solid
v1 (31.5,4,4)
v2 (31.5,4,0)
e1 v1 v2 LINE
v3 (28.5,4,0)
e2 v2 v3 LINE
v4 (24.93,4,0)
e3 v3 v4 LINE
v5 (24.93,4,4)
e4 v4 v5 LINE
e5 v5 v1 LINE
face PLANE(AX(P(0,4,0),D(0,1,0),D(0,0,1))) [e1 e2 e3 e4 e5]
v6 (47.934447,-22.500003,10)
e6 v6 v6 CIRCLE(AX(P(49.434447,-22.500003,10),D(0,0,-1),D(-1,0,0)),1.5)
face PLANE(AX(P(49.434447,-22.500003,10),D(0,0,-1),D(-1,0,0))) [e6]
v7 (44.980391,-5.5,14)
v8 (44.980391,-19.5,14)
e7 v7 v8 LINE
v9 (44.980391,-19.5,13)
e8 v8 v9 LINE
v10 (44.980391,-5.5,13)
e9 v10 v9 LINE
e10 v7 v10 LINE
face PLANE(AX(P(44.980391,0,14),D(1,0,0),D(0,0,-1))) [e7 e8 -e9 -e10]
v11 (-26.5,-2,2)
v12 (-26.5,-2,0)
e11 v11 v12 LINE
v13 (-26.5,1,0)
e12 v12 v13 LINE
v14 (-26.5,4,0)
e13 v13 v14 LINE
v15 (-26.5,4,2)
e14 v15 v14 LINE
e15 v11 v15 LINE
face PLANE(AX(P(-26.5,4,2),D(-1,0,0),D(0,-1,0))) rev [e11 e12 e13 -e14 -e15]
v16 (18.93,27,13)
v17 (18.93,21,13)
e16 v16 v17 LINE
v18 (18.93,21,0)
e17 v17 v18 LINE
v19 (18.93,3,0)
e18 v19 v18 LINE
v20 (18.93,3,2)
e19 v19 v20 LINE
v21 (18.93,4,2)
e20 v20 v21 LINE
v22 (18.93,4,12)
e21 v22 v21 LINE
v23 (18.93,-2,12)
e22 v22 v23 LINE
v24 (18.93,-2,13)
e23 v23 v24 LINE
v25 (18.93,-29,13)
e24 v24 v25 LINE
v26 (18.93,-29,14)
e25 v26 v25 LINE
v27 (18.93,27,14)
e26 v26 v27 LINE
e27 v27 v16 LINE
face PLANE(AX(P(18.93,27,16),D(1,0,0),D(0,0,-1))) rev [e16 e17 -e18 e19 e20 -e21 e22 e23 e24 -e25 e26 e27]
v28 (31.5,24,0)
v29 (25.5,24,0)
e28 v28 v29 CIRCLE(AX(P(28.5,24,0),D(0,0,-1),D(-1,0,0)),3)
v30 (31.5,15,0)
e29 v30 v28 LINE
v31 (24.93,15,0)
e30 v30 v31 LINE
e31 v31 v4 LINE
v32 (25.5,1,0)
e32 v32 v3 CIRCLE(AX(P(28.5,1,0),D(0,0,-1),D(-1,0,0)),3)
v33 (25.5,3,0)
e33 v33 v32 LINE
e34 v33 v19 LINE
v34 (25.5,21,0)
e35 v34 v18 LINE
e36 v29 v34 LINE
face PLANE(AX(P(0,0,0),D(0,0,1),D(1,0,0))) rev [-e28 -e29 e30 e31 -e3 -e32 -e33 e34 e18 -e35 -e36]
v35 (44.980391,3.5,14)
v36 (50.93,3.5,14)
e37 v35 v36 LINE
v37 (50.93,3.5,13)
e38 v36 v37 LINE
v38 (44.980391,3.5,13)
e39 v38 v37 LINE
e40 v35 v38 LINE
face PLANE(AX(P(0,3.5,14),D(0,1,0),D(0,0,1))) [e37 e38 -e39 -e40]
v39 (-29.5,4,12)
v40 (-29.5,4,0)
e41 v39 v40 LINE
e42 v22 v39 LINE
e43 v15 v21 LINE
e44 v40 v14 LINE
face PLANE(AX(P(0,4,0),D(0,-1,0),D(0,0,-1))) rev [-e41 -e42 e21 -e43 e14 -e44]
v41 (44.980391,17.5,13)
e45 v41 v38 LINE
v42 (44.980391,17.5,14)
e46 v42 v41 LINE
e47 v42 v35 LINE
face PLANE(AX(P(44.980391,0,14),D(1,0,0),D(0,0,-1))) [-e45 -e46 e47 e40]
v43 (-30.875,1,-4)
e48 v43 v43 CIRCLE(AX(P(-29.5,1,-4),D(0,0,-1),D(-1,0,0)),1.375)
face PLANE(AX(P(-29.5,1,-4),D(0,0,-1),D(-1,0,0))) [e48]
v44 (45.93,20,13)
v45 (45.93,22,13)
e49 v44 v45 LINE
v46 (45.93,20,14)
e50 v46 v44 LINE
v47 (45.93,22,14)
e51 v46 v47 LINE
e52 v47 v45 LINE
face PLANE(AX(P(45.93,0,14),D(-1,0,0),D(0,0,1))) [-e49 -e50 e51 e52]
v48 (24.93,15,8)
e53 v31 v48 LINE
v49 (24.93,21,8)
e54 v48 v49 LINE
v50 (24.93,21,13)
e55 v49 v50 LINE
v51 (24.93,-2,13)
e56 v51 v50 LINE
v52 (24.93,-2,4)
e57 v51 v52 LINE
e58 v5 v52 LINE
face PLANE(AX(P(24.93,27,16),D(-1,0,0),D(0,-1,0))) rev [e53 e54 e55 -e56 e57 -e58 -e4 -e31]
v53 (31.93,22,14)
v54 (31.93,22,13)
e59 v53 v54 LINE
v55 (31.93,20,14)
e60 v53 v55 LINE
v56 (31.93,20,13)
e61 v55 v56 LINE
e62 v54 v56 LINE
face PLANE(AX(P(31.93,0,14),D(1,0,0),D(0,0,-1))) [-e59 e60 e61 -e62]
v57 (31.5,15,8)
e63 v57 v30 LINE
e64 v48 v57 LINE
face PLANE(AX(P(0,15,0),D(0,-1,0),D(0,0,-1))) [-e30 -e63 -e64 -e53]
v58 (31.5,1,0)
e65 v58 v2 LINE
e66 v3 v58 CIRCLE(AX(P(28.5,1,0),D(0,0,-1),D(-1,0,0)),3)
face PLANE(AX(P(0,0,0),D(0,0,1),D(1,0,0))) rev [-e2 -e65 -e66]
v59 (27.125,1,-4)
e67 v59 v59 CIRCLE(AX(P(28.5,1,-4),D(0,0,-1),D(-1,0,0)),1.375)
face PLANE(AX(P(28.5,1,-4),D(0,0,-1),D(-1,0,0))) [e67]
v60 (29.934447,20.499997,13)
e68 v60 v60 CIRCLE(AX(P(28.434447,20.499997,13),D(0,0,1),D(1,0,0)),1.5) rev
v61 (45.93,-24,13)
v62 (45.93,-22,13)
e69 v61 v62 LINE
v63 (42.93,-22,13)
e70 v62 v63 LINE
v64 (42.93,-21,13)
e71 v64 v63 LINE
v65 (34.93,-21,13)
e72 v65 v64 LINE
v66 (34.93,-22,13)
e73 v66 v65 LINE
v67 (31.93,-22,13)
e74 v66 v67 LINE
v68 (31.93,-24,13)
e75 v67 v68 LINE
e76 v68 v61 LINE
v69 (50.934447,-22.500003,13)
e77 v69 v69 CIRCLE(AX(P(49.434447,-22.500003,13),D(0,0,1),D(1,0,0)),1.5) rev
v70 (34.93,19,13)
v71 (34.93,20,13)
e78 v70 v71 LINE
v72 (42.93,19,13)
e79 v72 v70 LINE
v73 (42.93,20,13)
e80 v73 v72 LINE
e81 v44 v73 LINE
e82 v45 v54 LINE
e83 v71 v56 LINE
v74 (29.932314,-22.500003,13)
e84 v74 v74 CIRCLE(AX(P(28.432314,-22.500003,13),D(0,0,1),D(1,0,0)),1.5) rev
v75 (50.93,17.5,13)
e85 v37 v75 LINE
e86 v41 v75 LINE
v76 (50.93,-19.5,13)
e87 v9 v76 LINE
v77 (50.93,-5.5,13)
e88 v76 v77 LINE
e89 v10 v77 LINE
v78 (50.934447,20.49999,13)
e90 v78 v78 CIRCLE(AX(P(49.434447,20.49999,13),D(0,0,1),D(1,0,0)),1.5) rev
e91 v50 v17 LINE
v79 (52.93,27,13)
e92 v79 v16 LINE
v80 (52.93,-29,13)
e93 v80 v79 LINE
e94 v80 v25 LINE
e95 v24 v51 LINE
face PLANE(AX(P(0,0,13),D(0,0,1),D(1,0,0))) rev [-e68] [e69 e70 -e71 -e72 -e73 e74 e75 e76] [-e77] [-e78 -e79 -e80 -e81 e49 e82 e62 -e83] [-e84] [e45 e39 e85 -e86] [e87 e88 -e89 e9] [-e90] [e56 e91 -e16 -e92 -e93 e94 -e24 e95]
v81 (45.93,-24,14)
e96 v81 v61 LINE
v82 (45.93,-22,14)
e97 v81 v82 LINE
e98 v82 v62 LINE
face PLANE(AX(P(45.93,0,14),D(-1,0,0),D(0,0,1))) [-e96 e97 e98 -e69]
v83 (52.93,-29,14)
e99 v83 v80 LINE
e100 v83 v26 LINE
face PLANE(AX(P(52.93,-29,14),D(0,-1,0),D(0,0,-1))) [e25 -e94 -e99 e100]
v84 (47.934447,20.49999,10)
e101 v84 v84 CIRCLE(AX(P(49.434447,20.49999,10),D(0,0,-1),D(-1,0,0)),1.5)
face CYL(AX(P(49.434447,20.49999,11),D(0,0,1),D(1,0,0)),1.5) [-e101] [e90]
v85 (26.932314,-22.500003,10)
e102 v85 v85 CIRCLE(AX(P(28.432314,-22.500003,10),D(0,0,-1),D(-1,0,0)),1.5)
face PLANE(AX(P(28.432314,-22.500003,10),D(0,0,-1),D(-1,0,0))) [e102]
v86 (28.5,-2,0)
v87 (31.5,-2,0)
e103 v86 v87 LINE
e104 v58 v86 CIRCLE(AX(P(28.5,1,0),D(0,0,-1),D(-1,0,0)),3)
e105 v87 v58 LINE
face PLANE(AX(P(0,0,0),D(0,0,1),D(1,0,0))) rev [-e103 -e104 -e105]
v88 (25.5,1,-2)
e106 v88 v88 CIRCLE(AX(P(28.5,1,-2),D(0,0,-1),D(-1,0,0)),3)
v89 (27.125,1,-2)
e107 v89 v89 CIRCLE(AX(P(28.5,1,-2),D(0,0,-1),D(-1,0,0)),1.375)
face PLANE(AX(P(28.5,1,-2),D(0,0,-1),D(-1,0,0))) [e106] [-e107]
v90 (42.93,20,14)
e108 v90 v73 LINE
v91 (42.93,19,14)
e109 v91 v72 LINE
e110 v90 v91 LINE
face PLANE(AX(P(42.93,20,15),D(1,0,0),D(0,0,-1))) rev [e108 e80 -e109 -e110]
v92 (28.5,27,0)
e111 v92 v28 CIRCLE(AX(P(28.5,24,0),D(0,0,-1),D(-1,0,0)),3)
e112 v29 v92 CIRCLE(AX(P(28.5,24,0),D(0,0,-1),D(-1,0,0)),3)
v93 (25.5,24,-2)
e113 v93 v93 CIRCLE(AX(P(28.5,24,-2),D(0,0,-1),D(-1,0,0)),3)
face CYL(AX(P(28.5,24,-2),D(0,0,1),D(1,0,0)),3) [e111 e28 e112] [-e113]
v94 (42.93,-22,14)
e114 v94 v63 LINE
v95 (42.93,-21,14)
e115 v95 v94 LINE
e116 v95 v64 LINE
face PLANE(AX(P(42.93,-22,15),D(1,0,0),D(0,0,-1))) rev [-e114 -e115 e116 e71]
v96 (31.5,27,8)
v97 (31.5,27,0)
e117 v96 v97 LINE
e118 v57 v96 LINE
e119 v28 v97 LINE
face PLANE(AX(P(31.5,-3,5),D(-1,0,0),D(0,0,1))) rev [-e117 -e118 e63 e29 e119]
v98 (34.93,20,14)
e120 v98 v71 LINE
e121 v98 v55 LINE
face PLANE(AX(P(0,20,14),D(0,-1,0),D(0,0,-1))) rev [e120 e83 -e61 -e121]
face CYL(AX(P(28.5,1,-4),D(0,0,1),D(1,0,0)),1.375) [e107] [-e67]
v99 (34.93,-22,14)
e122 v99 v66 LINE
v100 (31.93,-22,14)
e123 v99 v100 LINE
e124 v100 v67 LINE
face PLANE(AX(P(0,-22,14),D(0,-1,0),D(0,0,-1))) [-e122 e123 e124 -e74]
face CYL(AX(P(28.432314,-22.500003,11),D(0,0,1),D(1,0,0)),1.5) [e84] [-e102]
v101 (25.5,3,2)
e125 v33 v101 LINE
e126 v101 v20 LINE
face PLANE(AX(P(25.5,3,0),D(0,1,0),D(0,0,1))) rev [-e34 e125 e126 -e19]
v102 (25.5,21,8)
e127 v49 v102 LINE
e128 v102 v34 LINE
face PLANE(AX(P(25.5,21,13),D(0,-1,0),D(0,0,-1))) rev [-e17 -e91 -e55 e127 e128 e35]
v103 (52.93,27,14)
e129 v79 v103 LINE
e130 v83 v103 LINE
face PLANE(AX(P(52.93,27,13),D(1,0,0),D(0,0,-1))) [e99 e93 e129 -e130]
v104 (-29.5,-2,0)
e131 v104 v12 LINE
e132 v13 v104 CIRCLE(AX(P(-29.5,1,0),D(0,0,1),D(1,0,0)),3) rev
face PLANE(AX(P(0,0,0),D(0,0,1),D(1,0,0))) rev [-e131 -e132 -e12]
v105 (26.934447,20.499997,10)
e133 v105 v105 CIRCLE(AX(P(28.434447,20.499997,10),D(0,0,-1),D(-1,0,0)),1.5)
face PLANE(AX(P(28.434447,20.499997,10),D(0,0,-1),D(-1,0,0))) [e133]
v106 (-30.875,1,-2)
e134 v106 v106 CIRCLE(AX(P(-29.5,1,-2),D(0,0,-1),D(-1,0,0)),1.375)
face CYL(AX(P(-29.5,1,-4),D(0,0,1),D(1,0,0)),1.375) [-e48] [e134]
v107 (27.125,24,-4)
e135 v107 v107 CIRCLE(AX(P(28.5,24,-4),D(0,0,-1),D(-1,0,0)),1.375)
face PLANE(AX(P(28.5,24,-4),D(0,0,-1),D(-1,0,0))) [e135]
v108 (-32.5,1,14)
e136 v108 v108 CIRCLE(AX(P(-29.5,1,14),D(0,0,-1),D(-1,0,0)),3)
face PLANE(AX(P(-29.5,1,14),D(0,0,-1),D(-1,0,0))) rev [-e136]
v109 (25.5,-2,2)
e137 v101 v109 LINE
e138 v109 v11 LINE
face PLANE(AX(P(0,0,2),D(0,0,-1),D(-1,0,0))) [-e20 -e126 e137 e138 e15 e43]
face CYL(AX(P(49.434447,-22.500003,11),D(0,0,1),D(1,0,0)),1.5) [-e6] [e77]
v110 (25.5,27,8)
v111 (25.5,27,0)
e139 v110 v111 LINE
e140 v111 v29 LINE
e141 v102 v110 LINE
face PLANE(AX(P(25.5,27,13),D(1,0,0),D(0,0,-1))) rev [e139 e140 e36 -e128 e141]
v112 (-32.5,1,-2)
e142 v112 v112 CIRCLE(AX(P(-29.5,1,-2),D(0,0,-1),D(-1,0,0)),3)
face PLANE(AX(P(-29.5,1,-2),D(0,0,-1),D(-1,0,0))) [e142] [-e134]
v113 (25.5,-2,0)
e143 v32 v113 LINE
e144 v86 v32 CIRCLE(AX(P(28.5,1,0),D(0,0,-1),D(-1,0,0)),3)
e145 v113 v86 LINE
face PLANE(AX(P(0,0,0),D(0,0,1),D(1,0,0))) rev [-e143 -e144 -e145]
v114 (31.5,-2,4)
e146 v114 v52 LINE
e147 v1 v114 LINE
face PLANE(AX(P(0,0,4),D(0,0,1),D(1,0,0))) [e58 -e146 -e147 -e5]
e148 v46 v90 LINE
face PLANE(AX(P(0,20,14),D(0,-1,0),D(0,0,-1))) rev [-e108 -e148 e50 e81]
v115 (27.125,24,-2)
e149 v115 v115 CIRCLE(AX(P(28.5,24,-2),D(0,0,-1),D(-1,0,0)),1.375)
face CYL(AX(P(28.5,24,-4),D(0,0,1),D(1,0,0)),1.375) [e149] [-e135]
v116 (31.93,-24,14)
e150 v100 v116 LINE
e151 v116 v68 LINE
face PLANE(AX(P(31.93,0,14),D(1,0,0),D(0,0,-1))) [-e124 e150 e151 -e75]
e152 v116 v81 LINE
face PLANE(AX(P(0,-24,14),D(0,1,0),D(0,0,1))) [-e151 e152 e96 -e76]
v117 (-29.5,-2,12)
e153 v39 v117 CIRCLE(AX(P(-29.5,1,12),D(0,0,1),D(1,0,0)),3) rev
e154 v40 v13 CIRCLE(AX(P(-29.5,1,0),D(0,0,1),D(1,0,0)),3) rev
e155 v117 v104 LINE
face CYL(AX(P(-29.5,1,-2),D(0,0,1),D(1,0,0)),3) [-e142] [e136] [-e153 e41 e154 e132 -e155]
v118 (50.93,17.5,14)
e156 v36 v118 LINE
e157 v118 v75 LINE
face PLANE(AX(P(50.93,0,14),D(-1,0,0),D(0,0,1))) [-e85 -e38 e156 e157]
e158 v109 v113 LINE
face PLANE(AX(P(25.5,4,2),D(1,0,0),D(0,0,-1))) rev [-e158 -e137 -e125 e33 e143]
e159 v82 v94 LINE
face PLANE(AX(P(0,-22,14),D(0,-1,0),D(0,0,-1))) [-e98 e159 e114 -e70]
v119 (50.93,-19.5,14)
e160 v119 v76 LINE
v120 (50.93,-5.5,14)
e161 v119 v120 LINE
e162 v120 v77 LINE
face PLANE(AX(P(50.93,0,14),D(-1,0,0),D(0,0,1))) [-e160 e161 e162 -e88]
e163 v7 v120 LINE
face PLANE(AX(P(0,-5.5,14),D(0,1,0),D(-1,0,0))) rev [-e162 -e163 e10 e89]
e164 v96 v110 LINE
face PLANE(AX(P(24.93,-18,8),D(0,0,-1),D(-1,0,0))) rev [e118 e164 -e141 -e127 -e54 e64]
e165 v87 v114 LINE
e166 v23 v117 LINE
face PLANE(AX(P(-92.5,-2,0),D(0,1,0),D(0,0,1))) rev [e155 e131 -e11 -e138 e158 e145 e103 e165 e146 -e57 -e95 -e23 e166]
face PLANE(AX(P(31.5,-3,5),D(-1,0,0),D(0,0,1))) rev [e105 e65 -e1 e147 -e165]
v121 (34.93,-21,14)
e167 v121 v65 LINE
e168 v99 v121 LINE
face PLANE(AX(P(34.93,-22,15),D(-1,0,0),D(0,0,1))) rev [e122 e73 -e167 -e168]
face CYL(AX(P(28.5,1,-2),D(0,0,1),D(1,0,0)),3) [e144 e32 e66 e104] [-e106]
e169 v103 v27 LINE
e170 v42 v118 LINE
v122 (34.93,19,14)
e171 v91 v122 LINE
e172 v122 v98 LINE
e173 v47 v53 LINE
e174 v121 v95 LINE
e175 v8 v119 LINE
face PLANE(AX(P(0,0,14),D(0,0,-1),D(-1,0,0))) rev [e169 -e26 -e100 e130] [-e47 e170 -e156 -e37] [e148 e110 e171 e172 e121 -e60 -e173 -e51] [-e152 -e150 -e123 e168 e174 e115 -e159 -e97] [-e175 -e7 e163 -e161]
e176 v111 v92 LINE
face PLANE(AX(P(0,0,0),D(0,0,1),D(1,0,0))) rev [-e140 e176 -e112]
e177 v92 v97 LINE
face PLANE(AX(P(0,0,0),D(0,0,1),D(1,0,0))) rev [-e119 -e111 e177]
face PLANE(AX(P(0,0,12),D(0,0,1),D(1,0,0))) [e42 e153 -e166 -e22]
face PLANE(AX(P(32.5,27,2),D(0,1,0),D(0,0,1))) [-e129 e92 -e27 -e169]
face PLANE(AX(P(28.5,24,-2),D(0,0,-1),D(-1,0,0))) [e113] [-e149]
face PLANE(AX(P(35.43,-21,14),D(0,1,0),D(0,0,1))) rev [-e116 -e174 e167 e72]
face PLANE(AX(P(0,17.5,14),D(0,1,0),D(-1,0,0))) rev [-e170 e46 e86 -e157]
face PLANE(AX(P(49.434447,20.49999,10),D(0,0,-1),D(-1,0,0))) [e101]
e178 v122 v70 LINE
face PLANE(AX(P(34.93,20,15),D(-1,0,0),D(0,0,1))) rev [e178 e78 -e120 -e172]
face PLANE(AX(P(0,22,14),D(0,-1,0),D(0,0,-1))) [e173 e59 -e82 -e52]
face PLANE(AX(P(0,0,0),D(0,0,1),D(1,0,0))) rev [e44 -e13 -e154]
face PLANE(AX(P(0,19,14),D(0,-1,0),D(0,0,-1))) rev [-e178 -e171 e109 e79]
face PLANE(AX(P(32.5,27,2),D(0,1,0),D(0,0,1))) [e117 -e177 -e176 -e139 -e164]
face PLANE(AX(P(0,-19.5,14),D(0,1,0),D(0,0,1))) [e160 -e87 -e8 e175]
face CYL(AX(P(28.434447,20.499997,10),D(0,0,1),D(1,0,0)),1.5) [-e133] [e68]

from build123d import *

# Parameters (mm, degrees)
SKETCH_1_W            = 65
SKETCH_1_H            = 6
EXTRUDE_1_DEPTH       = 12
FILLET_4_R            = 3
FILLET_5_R            = 3
SKETCH_7_R            = 1.375
EXTRUDE_2_DEPTH       = 4
SKETCH_8_R            = 3
EXTRUDE_3_DEPTH       = 2
EXTRUDE_START         = 4
SKETCH_9_R            = 3
EXTRUDE_4_DEPTH       = 4
SKETCH_10_R           = 3
EXTRUDE_5_DEPTH       = 2
SKETCH_11_R           = 1.375
EXTRUDE_6_DEPTH       = 2
SKETCH_12_W           = 6
SKETCH_12_H           = 6
EXTRUDE_7_DEPTH       = 2
SKETCH_13_W           = 6
SKETCH_13_H           = 30
EXTRUDE_8_DEPTH       = 2
SKETCH_14_R           = 3
EXTRUDE_9_DEPTH       = 2
SKETCH_15_R           = 1.375
EXTRUDE_10_DEPTH      = 4
SKETCH_18_W           = 6
SKETCH_18_H           = 30
EXTRUDE_11_DEPTH      = 4
SKETCH_19_W           = 6
SKETCH_19_H           = 30
EXTRUDE_12_DEPTH      = 10
SKETCH_29_W           = 68.740273107
SKETCH_29_H           = 36.698484322
CUT_EXTRUDE_3_DEPTH   = 2
SKETCH_30_W           = 7.57
SKETCH_30_H           = 6
CUT_EXTRUDE_4_DEPTH   = 12
SKETCH_31_W           = 7.57
SKETCH_31_H           = 24
EXTRUDE_18_DEPTH      = 2
SKETCH_32_W           = 6
SKETCH_32_H           = 18
CUT_EXTRUDE_6_DEPTH   = 2
SKETCH_33_W           = 1.57
SKETCH_33_H           = 18
CUT_EXTRUDE_7_DEPTH   = 2
SKETCH_34_W           = 34
SKETCH_34_H           = 50
EXTRUDE_19_DEPTH      = 1
SKETCH_35_R           = 1.5
EXTRUDE_20_DEPTH      = 2
SKETCH_36_W           = 18
SKETCH_36_H           = 4
CUT_EXTRUDE_8_DEPTH   = 3
SKETCH_37_W           = 18
SKETCH_37_H           = 4
CUT_EXTRUDE_9_DEPTH   = 3
SKETCH_38_W           = 7.949608938
SKETCH_38_H           = 37
CUT_EXTRUDE_10_DEPTH  = 3
SKETCH_39_W           = 2
SKETCH_39_H           = 38.777384981
EXTRUDE_21_DEPTH      = 1
SKETCH_40_W           = 19.891420203
SKETCH_40_H           = 2
EXTRUDE_22_DEPTH      = 1
SKETCH_41_W           = 18
SKETCH_41_H           = 2
EXTRUDE_23_DEPTH      = 1
SKETCH_42_W           = 5.949608938
SKETCH_42_H           = 7.78599904
EXTRUDE_24_DEPTH      = 1
SKETCH_43_W           = 2
SKETCH_43_H           = 2
EXTRUDE_25_DEPTH      = 1
SKETCH_44_W           = 34
SKETCH_44_H           = 6
EXTRUDE_26_DEPTH      = 1
SKETCH_45_W           = 5.949608938
SKETCH_45_H           = 1.150209715
SKETCH_45_H_2         = 0.063791245
EXTRUDE_27_DEPTH      = 1
SKETCH_46_W           = 7
SKETCH_46_H           = 1
CUT_EXTRUDE_11_DEPTH  = 11
SKETCH_47_W           = 5
SKETCH_47_H           = 6
EXTRUDE_28_DEPTH      = 7
SKETCH_48_W           = 7.57
SKETCH_48_H           = 6
EXTRUDE_29_DEPTH      = 2
SKETCH_50_W           = 26.677609113
SKETCH_50_H           = 51.423807613
EXTRUDE_35_DEPTH      = 1
SKETCH_53_W           = 28.548663147
SKETCH_53_H           = 51.906660266
CUT_EXTRUDE_21_DEPTH  = 2
SKETCH_52_R           = 1.5
EXTRUDE_37_DEPTH      = 2
SKETCH_49_W           = 5.949608938
SKETCH_49_H           = 14
CUT_EXTRUDE_22_DEPTH  = 4
SKETCH_55_W           = 2
SKETCH_55_H           = 29.414250284
EXTRUDE_40_DEPTH      = 4
SKETCH_58_W           = 25.591190643
SKETCH_58_H           = 50.94095496
CUT_EXTRUDE_23_DEPTH  = 4
SKETCH_57_R           = 1.5
EXTRUDE_41_DEPTH      = 2
SKETCH_60_W           = 26.134399878
SKETCH_60_H           = 52.268799757
EXTRUDE_43_DEPTH      = 1
SKETCH_59_W           = 5.949608938
SKETCH_59_H           = 14
CUT_EXTRUDE_24_DEPTH  = 1
SKETCH_64_W           = 54.796032673
SKETCH_64_H           = 10.19721688
CUT_EXTRUDE_25_DEPTH  = 43
SKETCH_62_R           = 3
EXTRUDE_44_DEPTH      = 2
SKETCH_63_R           = 3
EXTRUDE_45_DEPTH      = 2
SKETCH_65_R           = 1.375
EXTRUDE_46_DEPTH      = 2
SKETCH_66_W           = 1
SKETCH_66_H           = 30
CUT_EXTRUDE_26_DEPTH  = 5
SKETCH_68_W           = 6.57
SKETCH_68_H           = 9
EXTRUDE_47_DEPTH      = 12
SKETCH_67_W           = 6.57
SKETCH_67_H           = 6
CUT_EXTRUDE_29_DEPTH  = 13
SKETCH_70_W           = 48.43
SKETCH_70_H           = 12
EXTRUDE_48_DEPTH      = 7
SKETCH_71_W           = 6.57
SKETCH_71_H           = 4
EXTRUDE_49_DEPTH      = 1
SKETCH_74_R           = 3
CUT_EXTRUDE_30_DEPTH  = 32
SKETCH_75_W           = 3.133028802
SKETCH_75_H           = 7
EXTRUDE_51_DEPTH      = 12
SKETCH_76_W           = 8.590635634
SKETCH_76_H           = 9.113505167
CUT_EXTRUDE_31_DEPTH  = 12
SKETCH_77_W           = 13
SKETCH_77_H           = 1
CUT_EXTRUDE_32_DEPTH  = 124
SKETCH_72_R           = 3
EXTRUDE_52_DEPTH      = 2
EXTRUDE_53_DEPTH      = 2
EXTRUDE_53_DEPTH_BACK = 14
SKETCH_73_R           = 3
SKETCH_78_R           = 1.375
EXTRUDE_54_DEPTH      = 2
SKETCH_79_W           = 52
SKETCH_79_H           = 6
CUT_EXTRUDE_33_DEPTH  = 2
SKETCH_80_W           = 6.57
SKETCH_80_H           = 1
EXTRUDE_55_DEPTH      = 2
SKETCH_81_W           = 8
SKETCH_81_H           = 1
CUT_EXTRUDE_34_DEPTH  = 2
SKETCH_82_W           = 6.57
SKETCH_82_H           = 1
CUT_EXTRUDE_35_DEPTH  = 45
SKETCH_83_R           = 1.5
SKETCH_83_R_2         = 1.497866477
EXTRUDE_56_DEPTH      = 1
SKETCH_84_R           = 2.738772592
CUT_EXTRUDE_36_DEPTH  = 3
SKETCH_85_R           = 1.5
EXTRUDE_57_DEPTH      = 3


with BuildPart() as part:
    # 草图1 → 凸台-拉伸1 (new body)
    with BuildSketch(Plane.XY):
        Rectangle(SKETCH_1_W, SKETCH_1_H)
    extrude(amount=EXTRUDE_1_DEPTH)

    # 圆角4
    fillet_4_edges = [part.edges().sort_by_distance(p)[0] for p in [
        (-32.5, -3, 6),
    ]]
    fillet(fillet_4_edges, radius=FILLET_4_R)

    # 圆角5
    fillet_5_edges = [part.edges().sort_by_distance(p)[0] for p in [
        (-32.5, 3, 6),
    ]]
    fillet(fillet_5_edges, radius=FILLET_5_R - 0.0001)  # a hair under: the kernel refuses the full size

    # 草图7 → 凸台-拉伸2 (add)
    with BuildSketch(Plane(origin=(0, 0, 0), x_dir=(-1, 0, 0), z_dir=(0, 0, -1))):
        with Locations((29.5, 0)):
            Circle(SKETCH_7_R)
    extrude(amount=EXTRUDE_2_DEPTH)

    # 草图8 → 凸台-拉伸3 (add)
    with BuildSketch(Plane(origin=(0, 0, 0), x_dir=(-1, 0, 0), z_dir=(0, 0, -1))):
        with Locations((29.5, 0)):
            Circle(SKETCH_8_R)
    extrude(amount=EXTRUDE_3_DEPTH)

    # 草图9 → 凸台-拉伸4 (add)
    with BuildSketch(Plane.XY.offset(12).offset(EXTRUDE_START)):
        with Locations(Location((-29.5, 0, 0), (0, 0, 180))):
            Circle(SKETCH_9_R)
    extrude(amount=-EXTRUDE_4_DEPTH)

    # 草图10 → 凸台-拉伸5 (add)
    with BuildSketch(Plane(origin=(0, 0, 0), x_dir=(-1, 0, 0), z_dir=(0, 0, -1))):
        with Locations(Location((-29.5, 0, 0), (0, 0, 180))):
            Circle(SKETCH_10_R)
    extrude(amount=EXTRUDE_5_DEPTH)

    # 草图11 → 凸台-拉伸6 (add)
    with BuildSketch(Plane(origin=(0, 0, -2), x_dir=(-1, 0, 0), z_dir=(0, 0, -1))):
        with Locations((-29.5, 0)):
            Circle(SKETCH_11_R)
    extrude(amount=EXTRUDE_6_DEPTH)

    # 草图12 → 凸台-拉伸7 (add)
    with BuildSketch(Plane.XY.offset(12)):
        with Locations((29.5, 0)):
            Rectangle(SKETCH_12_W, SKETCH_12_H)
    extrude(amount=EXTRUDE_7_DEPTH)

    # 草图13 → 凸台-拉伸8 (add)
    with BuildSketch(Plane(origin=(0, 0, 0), x_dir=(-1, 0, 0), z_dir=(0, 0, -1))):
        with Locations((-29.5, 12)):
            Rectangle(SKETCH_13_W, SKETCH_13_H)
    extrude(amount=-EXTRUDE_8_DEPTH)

    # 草图14 → 凸台-拉伸9 (add)
    with BuildSketch(Plane(origin=(0, 0, 0), x_dir=(-1, 0, 0), z_dir=(0, 0, -1))):
        with Locations((-29.5, 24)):
            Circle(SKETCH_14_R)
    extrude(amount=EXTRUDE_9_DEPTH)

    # 草图15 → 凸台-拉伸10 (add)
    with BuildSketch(Plane(origin=(0, 0, 0), x_dir=(-1, 0, 0), z_dir=(0, 0, -1))):
        with Locations((-29.5, 24)):
            Circle(SKETCH_15_R)
    extrude(amount=EXTRUDE_10_DEPTH)

    # 草图18 → 凸台-拉伸11 (add)
    with BuildSketch(Plane.XY.offset(12)):
        with Locations((21.93, 12)):
            Rectangle(SKETCH_18_W, SKETCH_18_H)
    extrude(amount=EXTRUDE_11_DEPTH)

    # 草图19 → 凸台-拉伸12 (add)
    with BuildSketch(Plane(origin=(0, 0, 12), x_dir=(-1, 0, 0), z_dir=(0, 0, -1))):
        with Locations((-21.93, 12)):
            Rectangle(SKETCH_19_W, SKETCH_19_H)
    extrude(amount=EXTRUDE_12_DEPTH)

    # 草图29 → 切除-拉伸3 (cut)
    with BuildSketch(Plane.XY.offset(16)):
        with Locations((-9.440136553, 8.650757839)):
            Rectangle(SKETCH_29_W, SKETCH_29_H)
    extrude(amount=-CUT_EXTRUDE_3_DEPTH, mode=Mode.SUBTRACT)

    # 草图30 → 切除-拉伸4 (cut)
    with BuildSketch(Plane.XY.offset(14)):
        with Locations((28.715, 0)):
            Rectangle(SKETCH_30_W, SKETCH_30_H)
    extrude(amount=-CUT_EXTRUDE_4_DEPTH, mode=Mode.SUBTRACT)

    # 草图31 → 凸台-拉伸18 (add)
    with BuildSketch(Plane(origin=(0, 0, 2), x_dir=(-1, 0, 0), z_dir=(0, 0, -1))):
        with Locations((-22.715, 15)):
            Rectangle(SKETCH_31_W, SKETCH_31_H)
    extrude(amount=EXTRUDE_18_DEPTH)

    # 草图32 → 切除-拉伸6 (cut)
    with BuildSketch(Plane(origin=(0, 0, 0), x_dir=(-1, 0, 0), z_dir=(0, 0, -1))):
        with Locations((-29.5, 12)):
            Rectangle(SKETCH_32_W, SKETCH_32_H)
    extrude(amount=-CUT_EXTRUDE_6_DEPTH, mode=Mode.SUBTRACT)

    # 草图33 → 切除-拉伸7 (cut)
    with BuildSketch(Plane.XY.offset(2)):
        with Locations((25.715, 12)):
            Rectangle(SKETCH_33_W, SKETCH_33_H)
    extrude(amount=-CUT_EXTRUDE_7_DEPTH, mode=Mode.SUBTRACT)

    # 草图34 → 凸台-拉伸19 (add)
    with BuildSketch(Plane.XY.offset(14)):
        with Locations((35.93, 2)):
            Rectangle(SKETCH_34_W, SKETCH_34_H)
    extrude(amount=-EXTRUDE_19_DEPTH)

    # 草图35 → 凸台-拉伸20 (add)
    with BuildSketch(Plane(origin=(0, 0, 13), x_dir=(-1, 0, 0), z_dir=(0, 0, -1))):
        with Locations(Location((-49.43, 23.5, 0), (0, 0, 180))):
            Circle(SKETCH_35_R)
        with Locations(Location((-49.43, -19.5, 0), (0, 0, 180))):
            Circle(SKETCH_35_R)
        with Locations(Location((-28.43, -19.5, 0), (0, 0, 180))):
            Circle(SKETCH_35_R)
        with Locations(Location((-28.43, 23.5, 0), (0, 0, 180))):
            Circle(SKETCH_35_R)
    extrude(amount=EXTRUDE_20_DEPTH)

    # 草图36 → 切除-拉伸8 (cut)
    with BuildSketch(Plane(origin=(0, 0, 13), x_dir=(-1, 0, 0), z_dir=(0, 0, -1))):
        with Locations((-38.93, 25)):
            Rectangle(SKETCH_36_W, SKETCH_36_H)
    extrude(amount=-CUT_EXTRUDE_8_DEPTH, mode=Mode.SUBTRACT)

    # 草图37 → 切除-拉伸9 (cut)
    with BuildSketch(Plane(origin=(0, 0, 13), x_dir=(-1, 0, 0), z_dir=(0, 0, -1))):
        with Locations((-38.93, -21)):
            Rectangle(SKETCH_37_W, SKETCH_37_H)
    extrude(amount=-CUT_EXTRUDE_9_DEPTH, mode=Mode.SUBTRACT)

    # 草图38 → 切除-拉伸10 (cut)
    with BuildSketch(Plane(origin=(0, 0, 13), x_dir=(-1, 0, 0), z_dir=(0, 0, -1))):
        with Locations((-48.955195531, 2)):
            Rectangle(SKETCH_38_W, SKETCH_38_H)
    extrude(amount=-CUT_EXTRUDE_10_DEPTH, mode=Mode.SUBTRACT)

    # 草图39 → 凸台-拉伸21 (add)
    with BuildSketch(Plane(origin=(0, 0, 13), x_dir=(-1, 0, 0), z_dir=(0, 0, -1))):
        with Locations((-51.93, 1.111307509)):
            Rectangle(SKETCH_39_W, SKETCH_39_H)
    extrude(amount=-EXTRUDE_21_DEPTH)

    # 草图40 → 凸台-拉伸22 (add)
    with BuildSketch(Plane(origin=(0, 0, 13), x_dir=(-1, 0, 0), z_dir=(0, 0, -1))):
        with Locations((-37.984289899, 26)):
            Rectangle(SKETCH_40_W, SKETCH_40_H)
    extrude(amount=-EXTRUDE_22_DEPTH)

    # 草图41 → 凸台-拉伸23 (add)
    with BuildSketch(Plane(origin=(0, 0, 13), x_dir=(-1, 0, 0), z_dir=(0, 0, -1))):
        with Locations((-38.93, -22)):
            Rectangle(SKETCH_41_W, SKETCH_41_H)
    extrude(amount=-EXTRUDE_23_DEPTH)

    # 草图42 → 凸台-拉伸24 (add)
    with BuildSketch(Plane(origin=(0, 0, 13), x_dir=(-1, 0, 0), z_dir=(0, 0, -1))):
        with Locations((-47.955195531, 1.456790765)):
            Rectangle(SKETCH_42_W, SKETCH_42_H)
    extrude(amount=-EXTRUDE_24_DEPTH)

    # 草图43 → 凸台-拉伸25 (add)
    with BuildSketch(Plane(origin=(0, 0, 13), x_dir=(-1, 0, 0), z_dir=(0, 0, -1))):
        with Locations((-46.93, -20)):
            Rectangle(SKETCH_43_W, SKETCH_43_H)
        with Locations((-30.93, -20)):
            Rectangle(SKETCH_43_W, SKETCH_43_H)
        with Locations((-46.93, 24)):
            Rectangle(SKETCH_43_W, SKETCH_43_H)
        with Locations((-30.93, 24)):
            Rectangle(SKETCH_43_W, SKETCH_43_H)
    extrude(amount=-EXTRUDE_25_DEPTH)

    # 草图44 → 凸台-拉伸26 (add)
    with BuildSketch(Plane(origin=(0, 0, 13), x_dir=(-1, 0, 0), z_dir=(0, 0, -1))):
        with Locations((-35.93, -26)):
            Rectangle(SKETCH_44_W, SKETCH_44_H)
    extrude(amount=-EXTRUDE_26_DEPTH)

    # 草图45 → 凸台-拉伸27 (add)
    with BuildSketch(Plane.XY.offset(14)):
        with Locations((47.955195531, 5.924895143)):
            Rectangle(SKETCH_45_W, SKETCH_45_H)
        with Locations((47.955195531, -2.468104378)):
            Rectangle(SKETCH_45_W, SKETCH_45_H_2)
    extrude(amount=-EXTRUDE_27_DEPTH)

    # 草图46 → 切除-拉伸11 (cut)
    with BuildSketch(Plane.XY.offset(14)):
        with Locations((38.93, 22.5)):
            Rectangle(SKETCH_46_W, SKETCH_46_H)
        with Locations((38.93, -18.5)):
            Rectangle(SKETCH_46_W, SKETCH_46_H)
    extrude(amount=-CUT_EXTRUDE_11_DEPTH, mode=Mode.SUBTRACT)

    # 草图47 → 凸台-拉伸28 (add)
    with BuildSketch(Plane.XY.offset(2)):
        with Locations((27.43, 24)):
            Rectangle(SKETCH_47_W, SKETCH_47_H)
    extrude(amount=EXTRUDE_28_DEPTH)

    # 草图48 → 凸台-拉伸29 (add)
    with BuildSketch(Plane.XY.offset(2)):
        with Locations((28.715, 0)):
            Rectangle(SKETCH_48_W, SKETCH_48_H)
    extrude(amount=EXTRUDE_29_DEPTH)

    # 草图50 → 凸台-拉伸35 (add)
    with BuildSketch(Plane(origin=(0, 0, 13), x_dir=(-1, 0, 0), z_dir=(0, 0, -1))):
        with Locations((-38.341167074, 0.599449416)):
            Rectangle(SKETCH_50_W, SKETCH_50_H)
    extrude(amount=-EXTRUDE_35_DEPTH)

    # 草图53 → 切除-拉伸21 (cut)
    with BuildSketch(Plane(origin=(0, 0, 13), x_dir=(-1, 0, 0), z_dir=(0, 0, -1))):
        with Locations((-37.767779549, -0.124829565)):
            Rectangle(SKETCH_53_W, SKETCH_53_H)
    extrude(amount=CUT_EXTRUDE_21_DEPTH, mode=Mode.SUBTRACT)

    # 草图52 → 凸台-拉伸37 (add)
    with BuildSketch(Plane(origin=(0, 0, 13), x_dir=(-1, 0, 0), z_dir=(0, 0, -1))):
        with Locations(Location((-49.43, 19.5, 0), (0, 0, 180))):
            Circle(SKETCH_52_R)
        with Locations(Location((-28.43, 19.5, 0), (0, 0, 180))):
            Circle(SKETCH_52_R)
        with Locations(Location((-49.43, -23.5, 0), (0, 0, 180))):
            Circle(SKETCH_52_R)
        with Locations(Location((-28.43, -23.5, 0), (0, 0, 180))):
            Circle(SKETCH_52_R)
    extrude(amount=EXTRUDE_37_DEPTH)

    # 草图49 → 切除-拉伸22 (cut)
    with BuildSketch(Plane(origin=(0, 0, 13), x_dir=(-1, 0, 0), z_dir=(0, 0, -1))):
        Polygon((-45.93, -23), (-45.93, -25), (-31.93, -25), (-31.93, -23), (-35.43, -23), (-35.43, -22), (-42.43, -22), (-42.43, -23), align=None)
        Polygon((-45.93, 19), (-42.43, 19), (-42.43, 18), (-35.43, 18), (-35.43, 19), (-31.93, 19), (-31.93, 21), (-45.93, 21), align=None)
        with Locations((-47.955195531, -13.5)):
            Rectangle(SKETCH_49_W, SKETCH_49_H)
        with Locations((-47.955195531, 9.5)):
            Rectangle(SKETCH_49_W, SKETCH_49_H)
    extrude(amount=-CUT_EXTRUDE_22_DEPTH, mode=Mode.SUBTRACT)

    # 草图55 → 凸台-拉伸40 (add)
    with BuildSketch(Plane(origin=(24.93, 0, 0), x_dir=(0, 0, -1), z_dir=(1, 0, 0))):
        with Locations((-12, 11.707125142)):
            Rectangle(SKETCH_55_W, SKETCH_55_H)
    extrude(amount=-EXTRUDE_40_DEPTH)

    # 草图58 → 切除-拉伸23 (cut)
    with BuildSketch(Plane(origin=(0, 0, 13), x_dir=(-1, 0, 0), z_dir=(0, 0, -1))):
        with Locations((-38.582593401, -2.840875742)):
            Rectangle(SKETCH_58_W, SKETCH_58_H)
    extrude(amount=CUT_EXTRUDE_23_DEPTH, mode=Mode.SUBTRACT)

    # 草图57 → 凸台-拉伸41 (add)
    with BuildSketch(Plane(origin=(0, 0, 13), x_dir=(-1, 0, 0), z_dir=(0, 0, -1))):
        with Locations(Location((-49.434447137, 20.499990111, 0), (0, 0, 180))):
            Circle(SKETCH_57_R)
        with Locations(Location((-28.434447137, 20.499990111, 0), (0, 0, 180))):
            Circle(SKETCH_57_R)
        with Locations(Location((-28.432313614, -22.500002676, 0), (0, 0, 180))):
            Circle(SKETCH_57_R)
        with Locations(Location((-49.434447137, -22.500002676, 0), (0, 0, 180))):
            Circle(SKETCH_57_R)
    extrude(amount=EXTRUDE_41_DEPTH)

    # 草图60 → 凸台-拉伸43 (add)
    with BuildSketch(Plane(origin=(0, 0, 13), x_dir=(-1, 0, 0), z_dir=(0, 0, -1))):
        with Locations((-39.337050673, -0.849108546)):
            Rectangle(SKETCH_60_W, SKETCH_60_H)
    extrude(amount=-EXTRUDE_43_DEPTH)

    # 草图59 → 切除-拉伸24 (cut)
    with BuildSketch(Plane(origin=(0, 0, 13), x_dir=(-1, 0, 0), z_dir=(0, 0, -1))):
        with Locations((-47.955195531, -12.5)):
            Rectangle(SKETCH_59_W, SKETCH_59_H)
        with Locations((-47.955195531, 10.5)):
            Rectangle(SKETCH_59_W, SKETCH_59_H)
        Polygon((-45.93, 22), (-45.93, 20), (-42.43, 20), (-42.43, 19), (-35.43, 19), (-35.43, 20), (-31.93, 20), (-31.93, 22), align=None)
        Polygon((-45.93, -24), (-31.93, -24), (-31.93, -22), (-35.43, -22), (-35.43, -21), (-42.43, -21), (-42.43, -22), (-45.93, -22), align=None)
    extrude(amount=-CUT_EXTRUDE_24_DEPTH, mode=Mode.SUBTRACT)

    # 草图64 → 切除-拉伸25 (cut)
    with BuildSketch(Plane.XZ.offset(3)):
        with Locations((5.101983663, -5.09860844)):
            Rectangle(SKETCH_64_W, SKETCH_64_H)
    extrude(amount=-CUT_EXTRUDE_25_DEPTH, mode=Mode.SUBTRACT)

    # 草图62 → 凸台-拉伸44 (add)
    with BuildSketch(Plane(origin=(0, 0, 0), x_dir=(-1, 0, 0), z_dir=(0, 0, -1))):
        with Locations(Location((-28.5, 0, 0), (0, 0, 270))):
            Circle(SKETCH_62_R)
    extrude(amount=EXTRUDE_44_DEPTH)

    # 草图63 → 凸台-拉伸45 (add)
    with BuildSketch(Plane(origin=(0, 0, 0), x_dir=(-1, 0, 0), z_dir=(0, 0, -1))):
        with Locations(Location((-28.5, 24, 0), (0, 0, 270))):
            Circle(SKETCH_63_R)
    extrude(amount=EXTRUDE_45_DEPTH)

    # 草图65 → 凸台-拉伸46 (add)
    with BuildSketch(Plane(origin=(0, 0, -2), x_dir=(-1, 0, 0), z_dir=(0, 0, -1))):
        with Locations((-28.5, 24)):
            Circle(SKETCH_65_R)
        with Locations((-28.5, 0)):
            Circle(SKETCH_65_R)
    extrude(amount=EXTRUDE_46_DEPTH)

    # 草图66 → 切除-拉伸26 (cut)
    with BuildSketch(Plane(origin=(0, 0, 0), x_dir=(-1, 0, 0), z_dir=(0, 0, -1))):
        with Locations((-32, 12)):
            Rectangle(SKETCH_66_W, SKETCH_66_H)
    extrude(amount=-CUT_EXTRUDE_26_DEPTH, mode=Mode.SUBTRACT)

    # 草图68 → 凸台-拉伸47 (add)
    with BuildSketch(Plane(origin=(0, 27, 0), x_dir=(1, 0, 0), z_dir=(0, 1, 0))):
        with Locations((28.215, -4.5)):
            Rectangle(SKETCH_68_W, SKETCH_68_H)
    extrude(amount=-EXTRUDE_47_DEPTH)

    # 草图67 → 切除-拉伸29 (cut)
    with BuildSketch(Plane(origin=(0, 0, 0), x_dir=(-1, 0, 0), z_dir=(0, 0, -1))):
        with Locations((-22.215, 24)):
            Rectangle(SKETCH_67_W, SKETCH_67_H)
    extrude(amount=-CUT_EXTRUDE_29_DEPTH, mode=Mode.SUBTRACT)

    # 草图70 → 凸台-拉伸48 (add)
    with BuildSketch(Plane.XZ.offset(3)):
        Polygon((24.93, 4), (24.93, 13), (18.93, 13), (18.93, 12), (18.93, 0), (24.93, 0), align=None)
        with Locations((-5.285, 6)):
            Rectangle(SKETCH_70_W, SKETCH_70_H)
    extrude(amount=-EXTRUDE_48_DEPTH)

    # 草图71 → 凸台-拉伸49 (add)
    with BuildSketch(Plane(origin=(0, 3, 0), x_dir=(1, 0, 0), z_dir=(0, 1, 0))):
        with Locations((28.215, -2)):
            Rectangle(SKETCH_71_W, SKETCH_71_H)
    extrude(amount=EXTRUDE_49_DEPTH)

    # 草图74 → 切除-拉伸30 (cut)
    with BuildSketch(Plane.XY.offset(14)):
        with Locations((-29.5, 0)):
            Circle(SKETCH_74_R)
    extrude(amount=-CUT_EXTRUDE_30_DEPTH, mode=Mode.SUBTRACT)


with BuildPart() as cut_extrude_30_kept_piece:
    # of the separate pieces the step leaves, the one the design keeps (cut_extrude_30_pieces_kept)
    add(part.part.solids().sort_by_distance((28.5, -3, 0))[0])

    # 草图75 → 凸台-拉伸51 (add)
    with BuildSketch(Plane(origin=(0, 0, 0), x_dir=(-1, 0, 0), z_dir=(0, 0, -1))):
        with Locations((27.933485599, 0.5)):
            Rectangle(SKETCH_75_W, SKETCH_75_H)
    extrude(amount=-EXTRUDE_51_DEPTH)

    # 草图76 → 切除-拉伸31 (cut)
    with BuildSketch(Plane(origin=(31.5, 0, 0), x_dir=(0, 0, -1), z_dir=(1, 0, 0))):
        with Locations((4.295317817, -0.556752584)):
            Rectangle(SKETCH_76_W, SKETCH_76_H)
    extrude(amount=-CUT_EXTRUDE_31_DEPTH, mode=Mode.SUBTRACT)

    # 草图77 → 切除-拉伸32 (cut)
    with BuildSketch(Plane(origin=(31.5, 0, 0), x_dir=(0, 0, -1), z_dir=(1, 0, 0))):
        with Locations((-6.5, -2.5)):
            Rectangle(SKETCH_77_W, SKETCH_77_H)
    extrude(amount=-CUT_EXTRUDE_32_DEPTH, mode=Mode.SUBTRACT)

    # 草图72 → 凸台-拉伸52 (add)
    with BuildSketch(Plane(origin=(0, 0, 0), x_dir=(-1, 0, 0), z_dir=(0, 0, -1))):
        with Locations(Location((-28.5, 1, 0), (0, 0, 180))):
            Circle(SKETCH_72_R)
    extrude(amount=EXTRUDE_52_DEPTH)

    # 草图73 → 凸台-拉伸53 (add, two sides: drawn at the far end of the back side and taken through both)
    with BuildSketch(Plane(origin=(0, 0, 0), x_dir=(-1, 0, 0), z_dir=(0, 0, -1)).offset(-EXTRUDE_53_DEPTH_BACK)):
        with Locations((29.5, 1)):
            Circle(SKETCH_73_R)
    extrude(amount=EXTRUDE_53_DEPTH + EXTRUDE_53_DEPTH_BACK)

    # 草图78 → 凸台-拉伸54 (add)
    with BuildSketch(Plane(origin=(0, 0, -2), x_dir=(-1, 0, 0), z_dir=(0, 0, -1))):
        with Locations((-28.5, 1)):
            Circle(SKETCH_78_R)
        with Locations((29.5, 1)):
            Circle(SKETCH_78_R)
    extrude(amount=EXTRUDE_54_DEPTH)

    # 草图79 → 切除-拉伸33 (cut)
    with BuildSketch(Plane(origin=(0, 0, 0), x_dir=(-1, 0, 0), z_dir=(0, 0, -1))):
        with Locations((0.5, 1)):
            Rectangle(SKETCH_79_W, SKETCH_79_H)
    extrude(amount=-CUT_EXTRUDE_33_DEPTH, mode=Mode.SUBTRACT)

    # 草图80 → 凸台-拉伸55 (add)
    with BuildSketch(Plane(origin=(0, 0, 2), x_dir=(-1, 0, 0), z_dir=(0, 0, -1))):
        with Locations((-22.215, 3.5)):
            Rectangle(SKETCH_80_W, SKETCH_80_H)
    extrude(amount=EXTRUDE_55_DEPTH)

    # 草图81 → 切除-拉伸34 (cut)
    with BuildSketch(Plane(origin=(0, 0, 13), x_dir=(-1, 0, 0), z_dir=(0, 0, -1))):
        with Locations((-38.93, -21.5)):
            Rectangle(SKETCH_81_W, SKETCH_81_H)
        with Locations((-38.93, 19.5)):
            Rectangle(SKETCH_81_W, SKETCH_81_H)
    extrude(amount=-CUT_EXTRUDE_34_DEPTH, mode=Mode.SUBTRACT)

    # 草图82 → 切除-拉伸35 (cut)
    with BuildSketch(Plane(origin=(0, 27, 0), x_dir=(1, 0, 0), z_dir=(0, 1, 0))):
        with Locations((28.215, -8.5)):
            Rectangle(SKETCH_82_W, SKETCH_82_H)
    extrude(amount=-CUT_EXTRUDE_35_DEPTH, mode=Mode.SUBTRACT)

    # 草图83 → 凸台-拉伸56 (add)
    with BuildSketch(Plane(origin=(0, 0, 11), x_dir=(-1, 0, 0), z_dir=(0, 0, -1))):
        with Locations(Location((-49.434447137, 20.499990111, 0), (0, 0, 180))):
            Circle(SKETCH_83_R)
        with Locations(Location((-49.434447137, -22.500002676, 0), (0, 0, 180))):
            Circle(SKETCH_83_R)
        with Locations(Location((-28.432313614, -22.500002676, 0), (0, 0, 180))):
            Circle(SKETCH_83_R)
        with Locations((-28.432313614, 20.499990111)):
            Circle(SKETCH_83_R_2)
    extrude(amount=EXTRUDE_56_DEPTH)

    # 草图84 → 切除-拉伸36 (cut)
    with BuildSketch(Plane(origin=(0, 0, 10), x_dir=(-1, 0, 0), z_dir=(0, 0, -1))):
        with Locations((-28.17934676, 20.387325453)):
            Circle(SKETCH_84_R)
    extrude(amount=-CUT_EXTRUDE_36_DEPTH, mode=Mode.SUBTRACT)

    # 草图85 → 凸台-拉伸57 (add)
    with BuildSketch(Plane(origin=(0, 0, 13), x_dir=(-1, 0, 0), z_dir=(0, 0, -1))):
        with Locations(Location((-28.434447137, 20.499997271, 0), (0, 0, 180))):
            Circle(SKETCH_85_R)
    extrude(amount=EXTRUDE_57_DEPTH)


solid = cut_extrude_30_kept_piece.part
